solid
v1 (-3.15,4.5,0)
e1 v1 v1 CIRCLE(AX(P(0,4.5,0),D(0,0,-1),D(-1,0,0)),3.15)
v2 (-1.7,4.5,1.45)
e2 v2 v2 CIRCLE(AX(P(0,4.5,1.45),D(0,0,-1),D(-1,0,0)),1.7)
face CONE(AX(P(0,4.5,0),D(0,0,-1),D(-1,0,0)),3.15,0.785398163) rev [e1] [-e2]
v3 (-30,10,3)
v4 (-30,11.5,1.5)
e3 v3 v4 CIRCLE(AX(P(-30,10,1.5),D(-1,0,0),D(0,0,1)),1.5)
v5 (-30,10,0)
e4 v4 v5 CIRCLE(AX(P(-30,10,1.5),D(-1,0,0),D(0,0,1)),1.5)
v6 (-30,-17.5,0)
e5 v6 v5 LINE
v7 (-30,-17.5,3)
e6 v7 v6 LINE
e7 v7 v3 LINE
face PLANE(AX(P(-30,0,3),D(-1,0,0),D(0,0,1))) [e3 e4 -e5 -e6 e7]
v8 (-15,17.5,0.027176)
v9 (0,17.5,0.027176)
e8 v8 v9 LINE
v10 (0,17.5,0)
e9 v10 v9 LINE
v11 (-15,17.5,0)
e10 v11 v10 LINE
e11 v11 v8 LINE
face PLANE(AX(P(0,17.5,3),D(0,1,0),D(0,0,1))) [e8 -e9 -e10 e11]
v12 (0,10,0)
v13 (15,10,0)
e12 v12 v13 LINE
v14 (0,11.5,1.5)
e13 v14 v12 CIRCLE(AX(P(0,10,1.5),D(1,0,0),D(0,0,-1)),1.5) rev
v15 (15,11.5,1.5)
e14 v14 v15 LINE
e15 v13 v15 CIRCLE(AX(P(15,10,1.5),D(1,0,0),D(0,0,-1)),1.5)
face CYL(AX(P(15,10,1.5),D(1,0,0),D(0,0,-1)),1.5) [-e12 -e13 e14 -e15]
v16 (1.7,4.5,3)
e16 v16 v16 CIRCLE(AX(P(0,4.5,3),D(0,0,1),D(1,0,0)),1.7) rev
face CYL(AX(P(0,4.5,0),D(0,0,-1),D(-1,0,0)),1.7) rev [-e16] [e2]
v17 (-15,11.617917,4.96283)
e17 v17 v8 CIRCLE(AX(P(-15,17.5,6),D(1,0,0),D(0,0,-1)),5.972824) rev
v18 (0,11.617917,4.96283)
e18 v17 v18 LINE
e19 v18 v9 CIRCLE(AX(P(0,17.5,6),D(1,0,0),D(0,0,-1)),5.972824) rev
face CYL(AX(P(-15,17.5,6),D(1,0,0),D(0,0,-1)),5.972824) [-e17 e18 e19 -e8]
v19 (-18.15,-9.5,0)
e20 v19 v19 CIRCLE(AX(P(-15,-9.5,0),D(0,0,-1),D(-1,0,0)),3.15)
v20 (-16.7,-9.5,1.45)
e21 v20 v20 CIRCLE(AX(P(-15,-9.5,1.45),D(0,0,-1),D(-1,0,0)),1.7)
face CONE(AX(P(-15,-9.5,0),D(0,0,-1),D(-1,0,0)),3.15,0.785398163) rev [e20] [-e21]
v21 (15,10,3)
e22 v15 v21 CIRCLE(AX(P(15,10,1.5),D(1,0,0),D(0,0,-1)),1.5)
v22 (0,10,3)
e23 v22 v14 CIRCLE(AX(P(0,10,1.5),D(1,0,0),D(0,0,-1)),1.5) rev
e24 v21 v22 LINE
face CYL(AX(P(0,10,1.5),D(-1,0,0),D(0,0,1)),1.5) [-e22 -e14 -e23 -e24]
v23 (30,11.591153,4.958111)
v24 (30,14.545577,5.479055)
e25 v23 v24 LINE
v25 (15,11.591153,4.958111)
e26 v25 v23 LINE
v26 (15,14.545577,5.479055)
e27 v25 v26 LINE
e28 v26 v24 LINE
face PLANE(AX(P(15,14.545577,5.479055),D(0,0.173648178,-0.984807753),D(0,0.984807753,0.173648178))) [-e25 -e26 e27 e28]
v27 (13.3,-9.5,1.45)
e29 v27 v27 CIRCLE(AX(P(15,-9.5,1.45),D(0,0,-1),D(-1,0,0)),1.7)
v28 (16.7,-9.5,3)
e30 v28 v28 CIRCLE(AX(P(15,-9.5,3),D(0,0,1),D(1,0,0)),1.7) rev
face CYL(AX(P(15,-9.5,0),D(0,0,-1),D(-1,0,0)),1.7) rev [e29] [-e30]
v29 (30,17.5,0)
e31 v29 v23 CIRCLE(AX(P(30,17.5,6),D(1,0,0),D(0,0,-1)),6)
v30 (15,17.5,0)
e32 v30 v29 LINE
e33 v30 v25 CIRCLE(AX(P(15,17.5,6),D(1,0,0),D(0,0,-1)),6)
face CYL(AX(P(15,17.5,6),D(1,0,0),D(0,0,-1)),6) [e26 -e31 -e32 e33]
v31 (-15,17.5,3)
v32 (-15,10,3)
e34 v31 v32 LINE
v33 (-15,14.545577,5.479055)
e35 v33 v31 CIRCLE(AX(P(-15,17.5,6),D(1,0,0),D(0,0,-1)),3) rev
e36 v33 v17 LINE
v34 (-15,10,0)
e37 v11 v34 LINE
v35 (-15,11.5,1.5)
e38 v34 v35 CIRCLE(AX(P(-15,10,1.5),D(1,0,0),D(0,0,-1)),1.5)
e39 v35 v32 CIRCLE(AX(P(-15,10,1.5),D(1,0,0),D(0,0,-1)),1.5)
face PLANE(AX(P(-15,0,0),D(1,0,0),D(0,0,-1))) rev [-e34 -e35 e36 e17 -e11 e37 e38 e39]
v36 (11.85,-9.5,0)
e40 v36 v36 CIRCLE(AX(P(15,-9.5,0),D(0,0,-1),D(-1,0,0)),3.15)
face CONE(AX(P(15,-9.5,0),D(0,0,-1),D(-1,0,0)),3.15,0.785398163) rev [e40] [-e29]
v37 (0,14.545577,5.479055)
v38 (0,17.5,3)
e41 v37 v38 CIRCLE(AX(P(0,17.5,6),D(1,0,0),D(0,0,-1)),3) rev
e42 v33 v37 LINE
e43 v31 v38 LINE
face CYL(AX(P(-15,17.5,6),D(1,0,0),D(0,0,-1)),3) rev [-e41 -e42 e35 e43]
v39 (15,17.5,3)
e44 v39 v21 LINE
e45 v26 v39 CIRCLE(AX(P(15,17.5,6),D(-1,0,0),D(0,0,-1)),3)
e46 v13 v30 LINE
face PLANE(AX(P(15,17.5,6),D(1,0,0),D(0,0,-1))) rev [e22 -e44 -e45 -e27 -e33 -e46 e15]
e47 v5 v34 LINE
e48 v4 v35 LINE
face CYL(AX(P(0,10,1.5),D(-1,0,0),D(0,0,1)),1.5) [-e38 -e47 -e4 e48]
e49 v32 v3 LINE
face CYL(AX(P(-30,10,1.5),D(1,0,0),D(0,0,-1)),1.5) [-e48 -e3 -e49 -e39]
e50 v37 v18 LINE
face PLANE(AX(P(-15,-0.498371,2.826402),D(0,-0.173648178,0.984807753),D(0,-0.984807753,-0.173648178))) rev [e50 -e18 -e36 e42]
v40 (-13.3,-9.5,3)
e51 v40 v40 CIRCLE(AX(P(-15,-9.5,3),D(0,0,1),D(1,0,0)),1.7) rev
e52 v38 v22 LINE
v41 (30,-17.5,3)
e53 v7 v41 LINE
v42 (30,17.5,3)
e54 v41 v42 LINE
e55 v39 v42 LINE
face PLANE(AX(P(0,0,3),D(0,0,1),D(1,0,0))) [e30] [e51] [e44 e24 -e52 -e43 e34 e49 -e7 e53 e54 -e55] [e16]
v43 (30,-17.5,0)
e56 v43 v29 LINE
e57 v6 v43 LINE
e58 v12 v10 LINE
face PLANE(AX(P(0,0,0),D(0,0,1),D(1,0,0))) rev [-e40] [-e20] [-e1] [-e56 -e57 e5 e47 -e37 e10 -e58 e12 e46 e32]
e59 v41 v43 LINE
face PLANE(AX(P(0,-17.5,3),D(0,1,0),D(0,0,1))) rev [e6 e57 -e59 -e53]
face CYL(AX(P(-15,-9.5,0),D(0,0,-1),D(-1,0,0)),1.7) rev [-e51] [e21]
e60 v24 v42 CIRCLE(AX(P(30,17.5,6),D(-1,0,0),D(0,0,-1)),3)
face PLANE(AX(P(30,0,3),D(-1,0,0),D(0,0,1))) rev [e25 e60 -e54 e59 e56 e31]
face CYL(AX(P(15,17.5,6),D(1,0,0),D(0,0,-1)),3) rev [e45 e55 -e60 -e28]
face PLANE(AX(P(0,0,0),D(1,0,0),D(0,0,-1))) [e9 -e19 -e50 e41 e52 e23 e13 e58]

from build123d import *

# Parameters (mm, degrees)
SKETCH1_W                                           = 60
SKETCH1_H                                           = 35
BOSS_EXTRUDE1_DEPTH                                 = 3
CSK_FOR_M3_COUNTERSUNK_FLAT_HEAD_SCREW1_D           = 3.4
CSK_FOR_M3_COUNTERSUNK_FLAT_HEAD_SCREW1_DEPTH       = 3
CSK_FOR_M3_COUNTERSUNK_FLAT_HEAD_SCREW1_CSINK_D     = 6.3
CSK_FOR_M3_COUNTERSUNK_FLAT_HEAD_SCREW1_CSINK_ANGLE = 90
CSK_FOR_M3_COUNTERSUNK_FLAT_HEAD_SCREW1_TIP         = 1.021463052
BOSS_EXTRUDE2_DEPTH                                 = 15
BOSS_EXTRUDE3_DEPTH                                 = 15
CUT_EXTRUDE4_DEPTH                                  = 15
SKETCH8_W                                           = 3
SKETCH8_H                                           = 6
CUT_EXTRUDE5_DEPTH                                  = 15
FILLET4_R                                           = 1.5


with BuildPart() as part:
    # Sketch1 → Boss-Extrude1 (new body)
    with BuildSketch(Plane.XY):
        Rectangle(SKETCH1_W, SKETCH1_H)
    extrude(amount=BOSS_EXTRUDE1_DEPTH)

    # CSK for M3 Countersunk Flat Head Screw1
    with Locations(Plane(origin=(0, 0, 0), x_dir=(1, 0, 0), z_dir=(0, 0, -1))):
        with Locations((0, -4.5), (-15, 9.5), (15, 9.5)):
            CounterSinkHole(CSK_FOR_M3_COUNTERSUNK_FLAT_HEAD_SCREW1_D / 2, CSK_FOR_M3_COUNTERSUNK_FLAT_HEAD_SCREW1_CSINK_D / 2, depth=CSK_FOR_M3_COUNTERSUNK_FLAT_HEAD_SCREW1_DEPTH, counter_sink_angle=CSK_FOR_M3_COUNTERSUNK_FLAT_HEAD_SCREW1_CSINK_ANGLE)
            with Locations((0, 0, -(CSK_FOR_M3_COUNTERSUNK_FLAT_HEAD_SCREW1_DEPTH + CSK_FOR_M3_COUNTERSUNK_FLAT_HEAD_SCREW1_TIP / 2))):  # 118° drill point
                Cone(0, CSK_FOR_M3_COUNTERSUNK_FLAT_HEAD_SCREW1_D / 2, CSK_FOR_M3_COUNTERSUNK_FLAT_HEAD_SCREW1_TIP, mode=Mode.SUBTRACT)

    # Sketch5 → Boss-Extrude2 (add)
    with BuildSketch(Plane(origin=(30, 0, 0), x_dir=(0, 0, -1), z_dir=(1, 0, 0))):
        with BuildLine():
            Line((-5.479055467, 14.545576741), (-4.958110934, 11.591153482))
            ThreePointArc((-4.958110934, 11.591153482), (-8.05212086, 23.138155725), (-3, 12.303847577))
            Line((-3, 12.303847577), (-3, 17.5))
            ThreePointArc((-3, 17.5), (-8.298133329, 19.428362829), (-5.479055467, 14.545576741))
        make_face()
    extrude(amount=-BOSS_EXTRUDE2_DEPTH)

    # Sketch6 → Boss-Extrude3 (add)
    with BuildSketch(Plane.ZY):
        with BuildLine():
            Line((3, 12.335251693), (3, 17.5))
            ThreePointArc((3, 17.5), (8.298133329, 19.428362829), (5.479055467, 14.545576741))
            Line((5.479055467, 14.545576741), (4.962830018, 11.617916738))
            ThreePointArc((4.962830018, 11.617916738), (8.050201874, 23.109928462), (3, 12.335251693))
        make_face()
    extrude(amount=BOSS_EXTRUDE3_DEPTH)

    # Sketch9 → Cut-Extrude4 (cut)
    with BuildSketch(Plane.ZY.offset(15)):
        Polygon((0.004777877, 17.5), (0, 17.5), (0, 11.5), (3, 11.5), (3, 17.5), (0.027176122, 17.5), align=None)
    extrude(amount=CUT_EXTRUDE4_DEPTH, mode=Mode.SUBTRACT)

    # Sketch8 → Cut-Extrude5 (cut)
    with BuildSketch(Plane(origin=(0, 0, 0), x_dir=(0, 0, -1), z_dir=(1, 0, 0))):
        with Locations((-1.5, 14.5)):
            Rectangle(SKETCH8_W, SKETCH8_H)
    extrude(amount=CUT_EXTRUDE5_DEPTH, mode=Mode.SUBTRACT)

    # Fillet4
    fillet4_edges = [part.edges().sort_by_distance(p)[0] for p in [
        (-22.5, 11.5, 0),
        (-22.5, 11.5, 3),
        (7.5, 11.5, 0),
        (7.5, 11.5, 3),
    ]]
    fillet(fillet4_edges, radius=FILLET4_R - 0.0001)  # a hair under: the kernel refuses the full size


solid = part.part
